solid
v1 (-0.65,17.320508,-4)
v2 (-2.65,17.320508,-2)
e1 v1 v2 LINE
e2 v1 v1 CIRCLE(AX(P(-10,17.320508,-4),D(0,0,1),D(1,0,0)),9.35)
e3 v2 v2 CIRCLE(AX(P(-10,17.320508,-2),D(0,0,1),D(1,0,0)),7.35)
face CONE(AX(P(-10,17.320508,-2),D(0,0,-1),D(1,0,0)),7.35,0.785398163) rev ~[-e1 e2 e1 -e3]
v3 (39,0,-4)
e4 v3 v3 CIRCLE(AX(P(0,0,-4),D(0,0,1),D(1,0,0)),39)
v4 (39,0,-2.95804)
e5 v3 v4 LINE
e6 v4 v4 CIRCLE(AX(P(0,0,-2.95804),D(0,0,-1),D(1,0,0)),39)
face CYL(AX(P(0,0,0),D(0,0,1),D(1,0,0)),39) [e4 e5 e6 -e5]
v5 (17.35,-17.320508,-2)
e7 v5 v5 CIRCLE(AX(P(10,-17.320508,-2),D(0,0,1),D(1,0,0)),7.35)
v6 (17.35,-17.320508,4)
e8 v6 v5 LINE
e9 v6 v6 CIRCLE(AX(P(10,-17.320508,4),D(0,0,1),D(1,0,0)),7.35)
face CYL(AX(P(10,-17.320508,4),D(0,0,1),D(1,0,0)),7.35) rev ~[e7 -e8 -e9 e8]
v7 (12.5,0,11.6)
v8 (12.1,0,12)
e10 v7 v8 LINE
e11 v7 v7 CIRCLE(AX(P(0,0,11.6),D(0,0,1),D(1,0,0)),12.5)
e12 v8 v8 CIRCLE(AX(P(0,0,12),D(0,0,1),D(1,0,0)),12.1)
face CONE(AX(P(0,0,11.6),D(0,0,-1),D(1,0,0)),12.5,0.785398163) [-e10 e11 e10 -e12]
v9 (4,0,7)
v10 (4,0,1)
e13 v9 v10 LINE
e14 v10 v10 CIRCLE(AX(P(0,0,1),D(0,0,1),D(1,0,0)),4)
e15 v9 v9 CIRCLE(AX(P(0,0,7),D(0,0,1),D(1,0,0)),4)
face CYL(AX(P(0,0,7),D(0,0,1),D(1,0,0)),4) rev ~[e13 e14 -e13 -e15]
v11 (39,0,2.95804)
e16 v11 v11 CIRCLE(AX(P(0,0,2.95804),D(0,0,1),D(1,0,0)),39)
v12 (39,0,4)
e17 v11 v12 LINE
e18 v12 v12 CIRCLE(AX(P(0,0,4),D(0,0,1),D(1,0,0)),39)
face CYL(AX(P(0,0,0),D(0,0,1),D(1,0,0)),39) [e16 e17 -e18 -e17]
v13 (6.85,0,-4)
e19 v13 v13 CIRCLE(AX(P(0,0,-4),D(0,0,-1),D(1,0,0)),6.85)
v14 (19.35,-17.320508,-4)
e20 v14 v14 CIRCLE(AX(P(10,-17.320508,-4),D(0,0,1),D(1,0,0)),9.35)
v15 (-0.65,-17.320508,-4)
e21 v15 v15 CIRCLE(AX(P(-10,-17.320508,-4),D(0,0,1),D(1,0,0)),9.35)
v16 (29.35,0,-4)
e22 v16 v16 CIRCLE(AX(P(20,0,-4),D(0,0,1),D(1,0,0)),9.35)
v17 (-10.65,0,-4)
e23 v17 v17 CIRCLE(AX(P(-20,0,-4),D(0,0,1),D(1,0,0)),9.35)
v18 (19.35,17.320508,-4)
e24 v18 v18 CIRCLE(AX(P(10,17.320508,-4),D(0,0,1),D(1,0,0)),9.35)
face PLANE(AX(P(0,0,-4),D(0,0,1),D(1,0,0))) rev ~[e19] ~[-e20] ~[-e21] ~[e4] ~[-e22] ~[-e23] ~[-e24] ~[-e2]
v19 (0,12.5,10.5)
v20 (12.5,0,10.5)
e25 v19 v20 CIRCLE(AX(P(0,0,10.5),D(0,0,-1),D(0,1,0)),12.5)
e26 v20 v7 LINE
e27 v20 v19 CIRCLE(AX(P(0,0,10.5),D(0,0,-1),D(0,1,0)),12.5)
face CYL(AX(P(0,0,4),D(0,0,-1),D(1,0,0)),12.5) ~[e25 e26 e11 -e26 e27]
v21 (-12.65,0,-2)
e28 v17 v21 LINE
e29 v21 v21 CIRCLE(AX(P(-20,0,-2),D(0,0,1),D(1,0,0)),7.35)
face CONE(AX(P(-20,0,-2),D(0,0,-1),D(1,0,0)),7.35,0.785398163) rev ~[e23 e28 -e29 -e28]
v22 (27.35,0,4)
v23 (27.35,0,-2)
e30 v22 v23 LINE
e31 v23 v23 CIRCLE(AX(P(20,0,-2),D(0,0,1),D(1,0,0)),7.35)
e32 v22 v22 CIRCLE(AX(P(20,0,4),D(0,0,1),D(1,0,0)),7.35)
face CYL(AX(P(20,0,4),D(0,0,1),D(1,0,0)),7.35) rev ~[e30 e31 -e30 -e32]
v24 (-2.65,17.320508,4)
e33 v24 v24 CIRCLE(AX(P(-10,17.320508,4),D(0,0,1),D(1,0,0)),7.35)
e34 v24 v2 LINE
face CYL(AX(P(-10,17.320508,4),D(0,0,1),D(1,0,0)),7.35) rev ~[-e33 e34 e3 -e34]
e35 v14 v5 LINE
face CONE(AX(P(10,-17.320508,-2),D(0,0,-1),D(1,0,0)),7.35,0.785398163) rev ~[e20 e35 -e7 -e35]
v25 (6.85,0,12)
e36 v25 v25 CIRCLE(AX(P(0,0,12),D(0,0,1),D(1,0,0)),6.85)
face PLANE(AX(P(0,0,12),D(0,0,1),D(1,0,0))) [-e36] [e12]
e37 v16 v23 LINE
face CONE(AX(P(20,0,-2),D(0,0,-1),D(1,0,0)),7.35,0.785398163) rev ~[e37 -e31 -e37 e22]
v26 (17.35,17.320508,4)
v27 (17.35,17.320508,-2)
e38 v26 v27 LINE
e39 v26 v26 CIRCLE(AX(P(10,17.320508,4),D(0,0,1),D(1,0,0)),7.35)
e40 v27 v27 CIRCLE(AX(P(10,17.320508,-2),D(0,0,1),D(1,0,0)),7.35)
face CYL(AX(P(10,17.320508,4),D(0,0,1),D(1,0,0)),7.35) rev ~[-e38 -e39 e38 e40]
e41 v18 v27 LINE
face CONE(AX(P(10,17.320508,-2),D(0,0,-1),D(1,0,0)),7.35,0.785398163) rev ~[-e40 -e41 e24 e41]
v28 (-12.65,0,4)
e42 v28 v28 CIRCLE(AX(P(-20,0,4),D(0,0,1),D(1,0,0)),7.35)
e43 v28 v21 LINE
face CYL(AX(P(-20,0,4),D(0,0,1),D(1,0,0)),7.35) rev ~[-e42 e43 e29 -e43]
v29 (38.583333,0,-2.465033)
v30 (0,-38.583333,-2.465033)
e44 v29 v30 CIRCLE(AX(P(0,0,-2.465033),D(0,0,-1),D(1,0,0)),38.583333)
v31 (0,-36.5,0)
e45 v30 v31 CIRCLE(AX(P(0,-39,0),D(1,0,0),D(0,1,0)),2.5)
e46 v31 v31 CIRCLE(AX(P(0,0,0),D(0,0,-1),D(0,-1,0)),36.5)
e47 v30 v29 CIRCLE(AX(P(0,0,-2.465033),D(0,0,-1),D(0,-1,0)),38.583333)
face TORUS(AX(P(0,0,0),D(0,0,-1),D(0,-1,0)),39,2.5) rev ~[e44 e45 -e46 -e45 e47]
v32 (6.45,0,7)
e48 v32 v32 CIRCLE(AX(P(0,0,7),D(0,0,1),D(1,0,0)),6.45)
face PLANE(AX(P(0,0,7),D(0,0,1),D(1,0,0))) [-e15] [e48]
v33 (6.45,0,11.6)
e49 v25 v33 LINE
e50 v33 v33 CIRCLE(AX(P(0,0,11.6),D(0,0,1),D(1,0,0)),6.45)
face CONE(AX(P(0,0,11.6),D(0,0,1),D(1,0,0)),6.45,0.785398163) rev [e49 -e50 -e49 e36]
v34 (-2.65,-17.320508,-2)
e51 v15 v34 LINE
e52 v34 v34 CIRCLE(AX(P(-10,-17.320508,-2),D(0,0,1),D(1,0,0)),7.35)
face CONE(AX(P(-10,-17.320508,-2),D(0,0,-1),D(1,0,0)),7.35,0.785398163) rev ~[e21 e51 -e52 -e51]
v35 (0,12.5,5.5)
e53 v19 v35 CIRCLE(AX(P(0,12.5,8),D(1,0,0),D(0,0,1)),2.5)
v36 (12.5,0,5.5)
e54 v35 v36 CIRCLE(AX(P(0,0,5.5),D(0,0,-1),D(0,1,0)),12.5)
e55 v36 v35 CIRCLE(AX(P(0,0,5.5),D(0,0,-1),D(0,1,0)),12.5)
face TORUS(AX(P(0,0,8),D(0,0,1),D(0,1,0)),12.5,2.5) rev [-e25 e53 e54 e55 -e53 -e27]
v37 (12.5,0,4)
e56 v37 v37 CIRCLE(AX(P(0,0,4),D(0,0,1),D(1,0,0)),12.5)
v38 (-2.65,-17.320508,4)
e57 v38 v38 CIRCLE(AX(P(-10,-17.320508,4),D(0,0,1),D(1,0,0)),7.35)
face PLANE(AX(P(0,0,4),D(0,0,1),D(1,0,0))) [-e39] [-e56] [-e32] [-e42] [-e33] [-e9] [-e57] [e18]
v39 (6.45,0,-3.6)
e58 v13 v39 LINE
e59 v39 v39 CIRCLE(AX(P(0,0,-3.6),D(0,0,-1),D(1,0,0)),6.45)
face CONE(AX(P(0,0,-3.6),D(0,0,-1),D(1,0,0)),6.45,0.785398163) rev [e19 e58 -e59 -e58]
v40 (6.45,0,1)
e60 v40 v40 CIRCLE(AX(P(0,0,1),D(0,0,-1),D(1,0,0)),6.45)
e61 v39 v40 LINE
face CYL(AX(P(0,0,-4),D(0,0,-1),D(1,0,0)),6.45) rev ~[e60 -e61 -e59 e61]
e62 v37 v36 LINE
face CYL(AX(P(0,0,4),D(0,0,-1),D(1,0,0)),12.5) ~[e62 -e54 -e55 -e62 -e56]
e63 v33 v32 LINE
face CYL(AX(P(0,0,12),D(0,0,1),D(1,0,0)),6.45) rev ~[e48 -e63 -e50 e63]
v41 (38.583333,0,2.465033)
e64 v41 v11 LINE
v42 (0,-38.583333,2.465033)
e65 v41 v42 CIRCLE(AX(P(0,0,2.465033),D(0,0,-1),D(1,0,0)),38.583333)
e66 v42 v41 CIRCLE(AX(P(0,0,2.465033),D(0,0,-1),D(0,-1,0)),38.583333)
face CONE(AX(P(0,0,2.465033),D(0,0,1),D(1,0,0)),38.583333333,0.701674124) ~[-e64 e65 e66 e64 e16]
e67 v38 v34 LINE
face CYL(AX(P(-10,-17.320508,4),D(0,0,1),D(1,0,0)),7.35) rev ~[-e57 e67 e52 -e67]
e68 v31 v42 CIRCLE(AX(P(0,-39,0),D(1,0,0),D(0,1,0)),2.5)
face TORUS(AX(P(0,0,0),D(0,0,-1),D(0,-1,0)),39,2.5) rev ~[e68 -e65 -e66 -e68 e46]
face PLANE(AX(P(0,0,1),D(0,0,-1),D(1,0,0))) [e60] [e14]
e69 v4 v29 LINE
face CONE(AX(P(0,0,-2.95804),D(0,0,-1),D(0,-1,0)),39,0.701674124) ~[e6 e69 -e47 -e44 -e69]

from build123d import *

# Parameters (mm, degrees)
F0_R        = 39
F0_R_2      = 2.325
F1_DEPTH    = 4
F2_R        = 2.5
F4_T2_ANGLE = 270
F4_T4_ANGLE = 90
F4_T6_ANGLE = 90
F4_T8_ANGLE = 270
F5_R        = 7.35
F6_DEPTH    = 25
F7_SIZE     = 2
F8_R        = 12.5
F9_DEPTH    = 8
F12_R       = 6.45
F13_DEPTH   = 5
F14_R       = 6.45
F15_DEPTH   = 5
F16_SIZE    = 0.4
F17_R       = 4
F18_DEPTH   = 11.001


# Not quite as in the source:
# - a fillet or chamfer that OpenCascade refuses, or shapes differently, is made with other operations: its cross-section is extruded or revolved along the edge and cut away or added
# - a feature names something its author has since deleted; it is built from what else it names


with BuildPart() as f1:
    # F0 (on Top) → F1 (new body, symmetric)
    with BuildSketch(Plane.XY):
        Circle(F0_R)
        Circle(F0_R_2, mode=Mode.SUBTRACT)
    extrude(amount=F1_DEPTH, both=True)

    # F2 (on Right) → F3 (revolve, cut)
    with BuildSketch(Plane.YZ):
        with Locations((-39, 0)):
            Circle(F2_R)
    revolve(axis=Axis((0, 0, 0), (0, 0, -1)), mode=Mode.SUBTRACT)

    # F4: chamfer of 0.5 on 4 edges, made by hand

    # F4_s1 → F4_t2 (revolve, cut)
    with BuildSketch(Plane.YZ):
        with BuildLine():
            Line((-39, -2.9580398915), (-38.5833333333, -2.465033243))
            ThreePointArc((-38.5833333333, -2.465033243), (-38.7838440297, -2.4906377891), (-39, -2.5))
            Line((-39, -2.5), (-39, -2.9580398915))
        make_face()
    revolve(axis=Axis((0, 0, -2.5), (0, 0, -1)), revolution_arc=F4_T2_ANGLE, mode=Mode.SUBTRACT)

    # F4_s3 → F4_t4 (revolve, cut)
    with BuildSketch(Plane.XZ):
        with BuildLine():
            Line((39, -2.9580398915), (38.5833333333, -2.465033243))
            ThreePointArc((38.5833333333, -2.465033243), (38.7838440297, -2.4906377891), (39, -2.5))
            Line((39, -2.5), (39, -2.9580398915))
        make_face()
    revolve(axis=Axis((0, 0, -2.5), (0, 0, -1)), revolution_arc=F4_T4_ANGLE, mode=Mode.SUBTRACT)

    # F4_s5 → F4_t6 (revolve, cut)
    with BuildSketch(Plane.XZ):
        with BuildLine():
            Line((38.5833333333, 2.465033243), (39, 2.9580398915))
            Line((39, 2.9580398915), (39, 2.5))
            ThreePointArc((39, 2.5), (38.7838440297, 2.4906377891), (38.5833333333, 2.465033243))
        make_face()
    revolve(axis=Axis((0, 0, 2.5), (0, 0, -1)), revolution_arc=F4_T6_ANGLE, mode=Mode.SUBTRACT)

    # F4_s7 → F4_t8 (revolve, cut)
    with BuildSketch(Plane.YZ):
        with BuildLine():
            Line((-38.5833333333, 2.465033243), (-39, 2.9580398915))
            Line((-39, 2.9580398915), (-39, 2.5))
            ThreePointArc((-39, 2.5), (-38.7838440297, 2.4906377891), (-38.5833333333, 2.465033243))
        make_face()
    revolve(axis=Axis((0, 0, 2.5), (0, 0, -1)), revolution_arc=F4_T8_ANGLE, mode=Mode.SUBTRACT)

    # F5 (on face) → F6 (cut)
    with BuildSketch(Plane.XY.offset(4)):
        with Locations((20, 0)):
            Circle(F5_R)
        with Locations((10, -17.3205080757)):
            Circle(F5_R)
        with Locations((-10, -17.3205080757)):
            Circle(F5_R)
        with Locations((-20, 0)):
            Circle(F5_R)
        with Locations((-10, 17.3205080757)):
            Circle(F5_R)
        with Locations((10, 17.3205080757)):
            Circle(F5_R)
    extrude(amount=-F6_DEPTH, mode=Mode.SUBTRACT)

    # F7
    f7_edges = [f1.edges().sort_by_distance(p)[0] for p in [
        (-27.35, 0, -4),
        (-17.35, -17.320508, -4),
        (2.65, -17.320508, -4),
        (12.65, 0, -4),
        (2.65, 17.320508, -4),
        (-17.35, 17.320508, -4),
    ]]
    chamfer(f7_edges, length=F7_SIZE)

    # F8 (on face) → F9 (join)
    with BuildSketch(Plane.XY.offset(4)):
        Circle(F8_R)
    extrude(amount=F9_DEPTH)

    # F10 (on Right) → F11 (revolve, cut)
    with BuildSketch(Plane.YZ):
        with BuildLine():
            Line((12.5, 5.5), (12.5, 10.5))
            ThreePointArc((12.5, 10.5), (10, 8), (12.5, 5.5))
        make_face()
    revolve(axis=Axis((0, 0, 4), (0, 0, -1)), mode=Mode.SUBTRACT)

    # F12 (on face) → F13 (cut)
    with BuildSketch(Plane.XY.offset(12)):
        Circle(F12_R)
    extrude(amount=-F13_DEPTH, mode=Mode.SUBTRACT)

    # F14 (on face) → F15 (cut)
    with BuildSketch(Plane(origin=(0, 0, -4), x_dir=(1, 0, 0), z_dir=(0, 0, -1))):
        Circle(F14_R)
    extrude(amount=-F15_DEPTH, mode=Mode.SUBTRACT)

    # F16
    f16_edges = [f1.edges().sort_by_distance(p)[0] for p in [
        (-12.5, 0, 12),
        (-6.45, 0, 12),
        (-6.45, 0, -4),
    ]]
    chamfer(f16_edges, length=F16_SIZE)

    # F17 (on face) → F18 (cut, through all)
    with BuildSketch(Plane.XY.offset(7)):
        Circle(F17_R)
    extrude(amount=-F18_DEPTH, mode=Mode.SUBTRACT)


solid = f1.part
